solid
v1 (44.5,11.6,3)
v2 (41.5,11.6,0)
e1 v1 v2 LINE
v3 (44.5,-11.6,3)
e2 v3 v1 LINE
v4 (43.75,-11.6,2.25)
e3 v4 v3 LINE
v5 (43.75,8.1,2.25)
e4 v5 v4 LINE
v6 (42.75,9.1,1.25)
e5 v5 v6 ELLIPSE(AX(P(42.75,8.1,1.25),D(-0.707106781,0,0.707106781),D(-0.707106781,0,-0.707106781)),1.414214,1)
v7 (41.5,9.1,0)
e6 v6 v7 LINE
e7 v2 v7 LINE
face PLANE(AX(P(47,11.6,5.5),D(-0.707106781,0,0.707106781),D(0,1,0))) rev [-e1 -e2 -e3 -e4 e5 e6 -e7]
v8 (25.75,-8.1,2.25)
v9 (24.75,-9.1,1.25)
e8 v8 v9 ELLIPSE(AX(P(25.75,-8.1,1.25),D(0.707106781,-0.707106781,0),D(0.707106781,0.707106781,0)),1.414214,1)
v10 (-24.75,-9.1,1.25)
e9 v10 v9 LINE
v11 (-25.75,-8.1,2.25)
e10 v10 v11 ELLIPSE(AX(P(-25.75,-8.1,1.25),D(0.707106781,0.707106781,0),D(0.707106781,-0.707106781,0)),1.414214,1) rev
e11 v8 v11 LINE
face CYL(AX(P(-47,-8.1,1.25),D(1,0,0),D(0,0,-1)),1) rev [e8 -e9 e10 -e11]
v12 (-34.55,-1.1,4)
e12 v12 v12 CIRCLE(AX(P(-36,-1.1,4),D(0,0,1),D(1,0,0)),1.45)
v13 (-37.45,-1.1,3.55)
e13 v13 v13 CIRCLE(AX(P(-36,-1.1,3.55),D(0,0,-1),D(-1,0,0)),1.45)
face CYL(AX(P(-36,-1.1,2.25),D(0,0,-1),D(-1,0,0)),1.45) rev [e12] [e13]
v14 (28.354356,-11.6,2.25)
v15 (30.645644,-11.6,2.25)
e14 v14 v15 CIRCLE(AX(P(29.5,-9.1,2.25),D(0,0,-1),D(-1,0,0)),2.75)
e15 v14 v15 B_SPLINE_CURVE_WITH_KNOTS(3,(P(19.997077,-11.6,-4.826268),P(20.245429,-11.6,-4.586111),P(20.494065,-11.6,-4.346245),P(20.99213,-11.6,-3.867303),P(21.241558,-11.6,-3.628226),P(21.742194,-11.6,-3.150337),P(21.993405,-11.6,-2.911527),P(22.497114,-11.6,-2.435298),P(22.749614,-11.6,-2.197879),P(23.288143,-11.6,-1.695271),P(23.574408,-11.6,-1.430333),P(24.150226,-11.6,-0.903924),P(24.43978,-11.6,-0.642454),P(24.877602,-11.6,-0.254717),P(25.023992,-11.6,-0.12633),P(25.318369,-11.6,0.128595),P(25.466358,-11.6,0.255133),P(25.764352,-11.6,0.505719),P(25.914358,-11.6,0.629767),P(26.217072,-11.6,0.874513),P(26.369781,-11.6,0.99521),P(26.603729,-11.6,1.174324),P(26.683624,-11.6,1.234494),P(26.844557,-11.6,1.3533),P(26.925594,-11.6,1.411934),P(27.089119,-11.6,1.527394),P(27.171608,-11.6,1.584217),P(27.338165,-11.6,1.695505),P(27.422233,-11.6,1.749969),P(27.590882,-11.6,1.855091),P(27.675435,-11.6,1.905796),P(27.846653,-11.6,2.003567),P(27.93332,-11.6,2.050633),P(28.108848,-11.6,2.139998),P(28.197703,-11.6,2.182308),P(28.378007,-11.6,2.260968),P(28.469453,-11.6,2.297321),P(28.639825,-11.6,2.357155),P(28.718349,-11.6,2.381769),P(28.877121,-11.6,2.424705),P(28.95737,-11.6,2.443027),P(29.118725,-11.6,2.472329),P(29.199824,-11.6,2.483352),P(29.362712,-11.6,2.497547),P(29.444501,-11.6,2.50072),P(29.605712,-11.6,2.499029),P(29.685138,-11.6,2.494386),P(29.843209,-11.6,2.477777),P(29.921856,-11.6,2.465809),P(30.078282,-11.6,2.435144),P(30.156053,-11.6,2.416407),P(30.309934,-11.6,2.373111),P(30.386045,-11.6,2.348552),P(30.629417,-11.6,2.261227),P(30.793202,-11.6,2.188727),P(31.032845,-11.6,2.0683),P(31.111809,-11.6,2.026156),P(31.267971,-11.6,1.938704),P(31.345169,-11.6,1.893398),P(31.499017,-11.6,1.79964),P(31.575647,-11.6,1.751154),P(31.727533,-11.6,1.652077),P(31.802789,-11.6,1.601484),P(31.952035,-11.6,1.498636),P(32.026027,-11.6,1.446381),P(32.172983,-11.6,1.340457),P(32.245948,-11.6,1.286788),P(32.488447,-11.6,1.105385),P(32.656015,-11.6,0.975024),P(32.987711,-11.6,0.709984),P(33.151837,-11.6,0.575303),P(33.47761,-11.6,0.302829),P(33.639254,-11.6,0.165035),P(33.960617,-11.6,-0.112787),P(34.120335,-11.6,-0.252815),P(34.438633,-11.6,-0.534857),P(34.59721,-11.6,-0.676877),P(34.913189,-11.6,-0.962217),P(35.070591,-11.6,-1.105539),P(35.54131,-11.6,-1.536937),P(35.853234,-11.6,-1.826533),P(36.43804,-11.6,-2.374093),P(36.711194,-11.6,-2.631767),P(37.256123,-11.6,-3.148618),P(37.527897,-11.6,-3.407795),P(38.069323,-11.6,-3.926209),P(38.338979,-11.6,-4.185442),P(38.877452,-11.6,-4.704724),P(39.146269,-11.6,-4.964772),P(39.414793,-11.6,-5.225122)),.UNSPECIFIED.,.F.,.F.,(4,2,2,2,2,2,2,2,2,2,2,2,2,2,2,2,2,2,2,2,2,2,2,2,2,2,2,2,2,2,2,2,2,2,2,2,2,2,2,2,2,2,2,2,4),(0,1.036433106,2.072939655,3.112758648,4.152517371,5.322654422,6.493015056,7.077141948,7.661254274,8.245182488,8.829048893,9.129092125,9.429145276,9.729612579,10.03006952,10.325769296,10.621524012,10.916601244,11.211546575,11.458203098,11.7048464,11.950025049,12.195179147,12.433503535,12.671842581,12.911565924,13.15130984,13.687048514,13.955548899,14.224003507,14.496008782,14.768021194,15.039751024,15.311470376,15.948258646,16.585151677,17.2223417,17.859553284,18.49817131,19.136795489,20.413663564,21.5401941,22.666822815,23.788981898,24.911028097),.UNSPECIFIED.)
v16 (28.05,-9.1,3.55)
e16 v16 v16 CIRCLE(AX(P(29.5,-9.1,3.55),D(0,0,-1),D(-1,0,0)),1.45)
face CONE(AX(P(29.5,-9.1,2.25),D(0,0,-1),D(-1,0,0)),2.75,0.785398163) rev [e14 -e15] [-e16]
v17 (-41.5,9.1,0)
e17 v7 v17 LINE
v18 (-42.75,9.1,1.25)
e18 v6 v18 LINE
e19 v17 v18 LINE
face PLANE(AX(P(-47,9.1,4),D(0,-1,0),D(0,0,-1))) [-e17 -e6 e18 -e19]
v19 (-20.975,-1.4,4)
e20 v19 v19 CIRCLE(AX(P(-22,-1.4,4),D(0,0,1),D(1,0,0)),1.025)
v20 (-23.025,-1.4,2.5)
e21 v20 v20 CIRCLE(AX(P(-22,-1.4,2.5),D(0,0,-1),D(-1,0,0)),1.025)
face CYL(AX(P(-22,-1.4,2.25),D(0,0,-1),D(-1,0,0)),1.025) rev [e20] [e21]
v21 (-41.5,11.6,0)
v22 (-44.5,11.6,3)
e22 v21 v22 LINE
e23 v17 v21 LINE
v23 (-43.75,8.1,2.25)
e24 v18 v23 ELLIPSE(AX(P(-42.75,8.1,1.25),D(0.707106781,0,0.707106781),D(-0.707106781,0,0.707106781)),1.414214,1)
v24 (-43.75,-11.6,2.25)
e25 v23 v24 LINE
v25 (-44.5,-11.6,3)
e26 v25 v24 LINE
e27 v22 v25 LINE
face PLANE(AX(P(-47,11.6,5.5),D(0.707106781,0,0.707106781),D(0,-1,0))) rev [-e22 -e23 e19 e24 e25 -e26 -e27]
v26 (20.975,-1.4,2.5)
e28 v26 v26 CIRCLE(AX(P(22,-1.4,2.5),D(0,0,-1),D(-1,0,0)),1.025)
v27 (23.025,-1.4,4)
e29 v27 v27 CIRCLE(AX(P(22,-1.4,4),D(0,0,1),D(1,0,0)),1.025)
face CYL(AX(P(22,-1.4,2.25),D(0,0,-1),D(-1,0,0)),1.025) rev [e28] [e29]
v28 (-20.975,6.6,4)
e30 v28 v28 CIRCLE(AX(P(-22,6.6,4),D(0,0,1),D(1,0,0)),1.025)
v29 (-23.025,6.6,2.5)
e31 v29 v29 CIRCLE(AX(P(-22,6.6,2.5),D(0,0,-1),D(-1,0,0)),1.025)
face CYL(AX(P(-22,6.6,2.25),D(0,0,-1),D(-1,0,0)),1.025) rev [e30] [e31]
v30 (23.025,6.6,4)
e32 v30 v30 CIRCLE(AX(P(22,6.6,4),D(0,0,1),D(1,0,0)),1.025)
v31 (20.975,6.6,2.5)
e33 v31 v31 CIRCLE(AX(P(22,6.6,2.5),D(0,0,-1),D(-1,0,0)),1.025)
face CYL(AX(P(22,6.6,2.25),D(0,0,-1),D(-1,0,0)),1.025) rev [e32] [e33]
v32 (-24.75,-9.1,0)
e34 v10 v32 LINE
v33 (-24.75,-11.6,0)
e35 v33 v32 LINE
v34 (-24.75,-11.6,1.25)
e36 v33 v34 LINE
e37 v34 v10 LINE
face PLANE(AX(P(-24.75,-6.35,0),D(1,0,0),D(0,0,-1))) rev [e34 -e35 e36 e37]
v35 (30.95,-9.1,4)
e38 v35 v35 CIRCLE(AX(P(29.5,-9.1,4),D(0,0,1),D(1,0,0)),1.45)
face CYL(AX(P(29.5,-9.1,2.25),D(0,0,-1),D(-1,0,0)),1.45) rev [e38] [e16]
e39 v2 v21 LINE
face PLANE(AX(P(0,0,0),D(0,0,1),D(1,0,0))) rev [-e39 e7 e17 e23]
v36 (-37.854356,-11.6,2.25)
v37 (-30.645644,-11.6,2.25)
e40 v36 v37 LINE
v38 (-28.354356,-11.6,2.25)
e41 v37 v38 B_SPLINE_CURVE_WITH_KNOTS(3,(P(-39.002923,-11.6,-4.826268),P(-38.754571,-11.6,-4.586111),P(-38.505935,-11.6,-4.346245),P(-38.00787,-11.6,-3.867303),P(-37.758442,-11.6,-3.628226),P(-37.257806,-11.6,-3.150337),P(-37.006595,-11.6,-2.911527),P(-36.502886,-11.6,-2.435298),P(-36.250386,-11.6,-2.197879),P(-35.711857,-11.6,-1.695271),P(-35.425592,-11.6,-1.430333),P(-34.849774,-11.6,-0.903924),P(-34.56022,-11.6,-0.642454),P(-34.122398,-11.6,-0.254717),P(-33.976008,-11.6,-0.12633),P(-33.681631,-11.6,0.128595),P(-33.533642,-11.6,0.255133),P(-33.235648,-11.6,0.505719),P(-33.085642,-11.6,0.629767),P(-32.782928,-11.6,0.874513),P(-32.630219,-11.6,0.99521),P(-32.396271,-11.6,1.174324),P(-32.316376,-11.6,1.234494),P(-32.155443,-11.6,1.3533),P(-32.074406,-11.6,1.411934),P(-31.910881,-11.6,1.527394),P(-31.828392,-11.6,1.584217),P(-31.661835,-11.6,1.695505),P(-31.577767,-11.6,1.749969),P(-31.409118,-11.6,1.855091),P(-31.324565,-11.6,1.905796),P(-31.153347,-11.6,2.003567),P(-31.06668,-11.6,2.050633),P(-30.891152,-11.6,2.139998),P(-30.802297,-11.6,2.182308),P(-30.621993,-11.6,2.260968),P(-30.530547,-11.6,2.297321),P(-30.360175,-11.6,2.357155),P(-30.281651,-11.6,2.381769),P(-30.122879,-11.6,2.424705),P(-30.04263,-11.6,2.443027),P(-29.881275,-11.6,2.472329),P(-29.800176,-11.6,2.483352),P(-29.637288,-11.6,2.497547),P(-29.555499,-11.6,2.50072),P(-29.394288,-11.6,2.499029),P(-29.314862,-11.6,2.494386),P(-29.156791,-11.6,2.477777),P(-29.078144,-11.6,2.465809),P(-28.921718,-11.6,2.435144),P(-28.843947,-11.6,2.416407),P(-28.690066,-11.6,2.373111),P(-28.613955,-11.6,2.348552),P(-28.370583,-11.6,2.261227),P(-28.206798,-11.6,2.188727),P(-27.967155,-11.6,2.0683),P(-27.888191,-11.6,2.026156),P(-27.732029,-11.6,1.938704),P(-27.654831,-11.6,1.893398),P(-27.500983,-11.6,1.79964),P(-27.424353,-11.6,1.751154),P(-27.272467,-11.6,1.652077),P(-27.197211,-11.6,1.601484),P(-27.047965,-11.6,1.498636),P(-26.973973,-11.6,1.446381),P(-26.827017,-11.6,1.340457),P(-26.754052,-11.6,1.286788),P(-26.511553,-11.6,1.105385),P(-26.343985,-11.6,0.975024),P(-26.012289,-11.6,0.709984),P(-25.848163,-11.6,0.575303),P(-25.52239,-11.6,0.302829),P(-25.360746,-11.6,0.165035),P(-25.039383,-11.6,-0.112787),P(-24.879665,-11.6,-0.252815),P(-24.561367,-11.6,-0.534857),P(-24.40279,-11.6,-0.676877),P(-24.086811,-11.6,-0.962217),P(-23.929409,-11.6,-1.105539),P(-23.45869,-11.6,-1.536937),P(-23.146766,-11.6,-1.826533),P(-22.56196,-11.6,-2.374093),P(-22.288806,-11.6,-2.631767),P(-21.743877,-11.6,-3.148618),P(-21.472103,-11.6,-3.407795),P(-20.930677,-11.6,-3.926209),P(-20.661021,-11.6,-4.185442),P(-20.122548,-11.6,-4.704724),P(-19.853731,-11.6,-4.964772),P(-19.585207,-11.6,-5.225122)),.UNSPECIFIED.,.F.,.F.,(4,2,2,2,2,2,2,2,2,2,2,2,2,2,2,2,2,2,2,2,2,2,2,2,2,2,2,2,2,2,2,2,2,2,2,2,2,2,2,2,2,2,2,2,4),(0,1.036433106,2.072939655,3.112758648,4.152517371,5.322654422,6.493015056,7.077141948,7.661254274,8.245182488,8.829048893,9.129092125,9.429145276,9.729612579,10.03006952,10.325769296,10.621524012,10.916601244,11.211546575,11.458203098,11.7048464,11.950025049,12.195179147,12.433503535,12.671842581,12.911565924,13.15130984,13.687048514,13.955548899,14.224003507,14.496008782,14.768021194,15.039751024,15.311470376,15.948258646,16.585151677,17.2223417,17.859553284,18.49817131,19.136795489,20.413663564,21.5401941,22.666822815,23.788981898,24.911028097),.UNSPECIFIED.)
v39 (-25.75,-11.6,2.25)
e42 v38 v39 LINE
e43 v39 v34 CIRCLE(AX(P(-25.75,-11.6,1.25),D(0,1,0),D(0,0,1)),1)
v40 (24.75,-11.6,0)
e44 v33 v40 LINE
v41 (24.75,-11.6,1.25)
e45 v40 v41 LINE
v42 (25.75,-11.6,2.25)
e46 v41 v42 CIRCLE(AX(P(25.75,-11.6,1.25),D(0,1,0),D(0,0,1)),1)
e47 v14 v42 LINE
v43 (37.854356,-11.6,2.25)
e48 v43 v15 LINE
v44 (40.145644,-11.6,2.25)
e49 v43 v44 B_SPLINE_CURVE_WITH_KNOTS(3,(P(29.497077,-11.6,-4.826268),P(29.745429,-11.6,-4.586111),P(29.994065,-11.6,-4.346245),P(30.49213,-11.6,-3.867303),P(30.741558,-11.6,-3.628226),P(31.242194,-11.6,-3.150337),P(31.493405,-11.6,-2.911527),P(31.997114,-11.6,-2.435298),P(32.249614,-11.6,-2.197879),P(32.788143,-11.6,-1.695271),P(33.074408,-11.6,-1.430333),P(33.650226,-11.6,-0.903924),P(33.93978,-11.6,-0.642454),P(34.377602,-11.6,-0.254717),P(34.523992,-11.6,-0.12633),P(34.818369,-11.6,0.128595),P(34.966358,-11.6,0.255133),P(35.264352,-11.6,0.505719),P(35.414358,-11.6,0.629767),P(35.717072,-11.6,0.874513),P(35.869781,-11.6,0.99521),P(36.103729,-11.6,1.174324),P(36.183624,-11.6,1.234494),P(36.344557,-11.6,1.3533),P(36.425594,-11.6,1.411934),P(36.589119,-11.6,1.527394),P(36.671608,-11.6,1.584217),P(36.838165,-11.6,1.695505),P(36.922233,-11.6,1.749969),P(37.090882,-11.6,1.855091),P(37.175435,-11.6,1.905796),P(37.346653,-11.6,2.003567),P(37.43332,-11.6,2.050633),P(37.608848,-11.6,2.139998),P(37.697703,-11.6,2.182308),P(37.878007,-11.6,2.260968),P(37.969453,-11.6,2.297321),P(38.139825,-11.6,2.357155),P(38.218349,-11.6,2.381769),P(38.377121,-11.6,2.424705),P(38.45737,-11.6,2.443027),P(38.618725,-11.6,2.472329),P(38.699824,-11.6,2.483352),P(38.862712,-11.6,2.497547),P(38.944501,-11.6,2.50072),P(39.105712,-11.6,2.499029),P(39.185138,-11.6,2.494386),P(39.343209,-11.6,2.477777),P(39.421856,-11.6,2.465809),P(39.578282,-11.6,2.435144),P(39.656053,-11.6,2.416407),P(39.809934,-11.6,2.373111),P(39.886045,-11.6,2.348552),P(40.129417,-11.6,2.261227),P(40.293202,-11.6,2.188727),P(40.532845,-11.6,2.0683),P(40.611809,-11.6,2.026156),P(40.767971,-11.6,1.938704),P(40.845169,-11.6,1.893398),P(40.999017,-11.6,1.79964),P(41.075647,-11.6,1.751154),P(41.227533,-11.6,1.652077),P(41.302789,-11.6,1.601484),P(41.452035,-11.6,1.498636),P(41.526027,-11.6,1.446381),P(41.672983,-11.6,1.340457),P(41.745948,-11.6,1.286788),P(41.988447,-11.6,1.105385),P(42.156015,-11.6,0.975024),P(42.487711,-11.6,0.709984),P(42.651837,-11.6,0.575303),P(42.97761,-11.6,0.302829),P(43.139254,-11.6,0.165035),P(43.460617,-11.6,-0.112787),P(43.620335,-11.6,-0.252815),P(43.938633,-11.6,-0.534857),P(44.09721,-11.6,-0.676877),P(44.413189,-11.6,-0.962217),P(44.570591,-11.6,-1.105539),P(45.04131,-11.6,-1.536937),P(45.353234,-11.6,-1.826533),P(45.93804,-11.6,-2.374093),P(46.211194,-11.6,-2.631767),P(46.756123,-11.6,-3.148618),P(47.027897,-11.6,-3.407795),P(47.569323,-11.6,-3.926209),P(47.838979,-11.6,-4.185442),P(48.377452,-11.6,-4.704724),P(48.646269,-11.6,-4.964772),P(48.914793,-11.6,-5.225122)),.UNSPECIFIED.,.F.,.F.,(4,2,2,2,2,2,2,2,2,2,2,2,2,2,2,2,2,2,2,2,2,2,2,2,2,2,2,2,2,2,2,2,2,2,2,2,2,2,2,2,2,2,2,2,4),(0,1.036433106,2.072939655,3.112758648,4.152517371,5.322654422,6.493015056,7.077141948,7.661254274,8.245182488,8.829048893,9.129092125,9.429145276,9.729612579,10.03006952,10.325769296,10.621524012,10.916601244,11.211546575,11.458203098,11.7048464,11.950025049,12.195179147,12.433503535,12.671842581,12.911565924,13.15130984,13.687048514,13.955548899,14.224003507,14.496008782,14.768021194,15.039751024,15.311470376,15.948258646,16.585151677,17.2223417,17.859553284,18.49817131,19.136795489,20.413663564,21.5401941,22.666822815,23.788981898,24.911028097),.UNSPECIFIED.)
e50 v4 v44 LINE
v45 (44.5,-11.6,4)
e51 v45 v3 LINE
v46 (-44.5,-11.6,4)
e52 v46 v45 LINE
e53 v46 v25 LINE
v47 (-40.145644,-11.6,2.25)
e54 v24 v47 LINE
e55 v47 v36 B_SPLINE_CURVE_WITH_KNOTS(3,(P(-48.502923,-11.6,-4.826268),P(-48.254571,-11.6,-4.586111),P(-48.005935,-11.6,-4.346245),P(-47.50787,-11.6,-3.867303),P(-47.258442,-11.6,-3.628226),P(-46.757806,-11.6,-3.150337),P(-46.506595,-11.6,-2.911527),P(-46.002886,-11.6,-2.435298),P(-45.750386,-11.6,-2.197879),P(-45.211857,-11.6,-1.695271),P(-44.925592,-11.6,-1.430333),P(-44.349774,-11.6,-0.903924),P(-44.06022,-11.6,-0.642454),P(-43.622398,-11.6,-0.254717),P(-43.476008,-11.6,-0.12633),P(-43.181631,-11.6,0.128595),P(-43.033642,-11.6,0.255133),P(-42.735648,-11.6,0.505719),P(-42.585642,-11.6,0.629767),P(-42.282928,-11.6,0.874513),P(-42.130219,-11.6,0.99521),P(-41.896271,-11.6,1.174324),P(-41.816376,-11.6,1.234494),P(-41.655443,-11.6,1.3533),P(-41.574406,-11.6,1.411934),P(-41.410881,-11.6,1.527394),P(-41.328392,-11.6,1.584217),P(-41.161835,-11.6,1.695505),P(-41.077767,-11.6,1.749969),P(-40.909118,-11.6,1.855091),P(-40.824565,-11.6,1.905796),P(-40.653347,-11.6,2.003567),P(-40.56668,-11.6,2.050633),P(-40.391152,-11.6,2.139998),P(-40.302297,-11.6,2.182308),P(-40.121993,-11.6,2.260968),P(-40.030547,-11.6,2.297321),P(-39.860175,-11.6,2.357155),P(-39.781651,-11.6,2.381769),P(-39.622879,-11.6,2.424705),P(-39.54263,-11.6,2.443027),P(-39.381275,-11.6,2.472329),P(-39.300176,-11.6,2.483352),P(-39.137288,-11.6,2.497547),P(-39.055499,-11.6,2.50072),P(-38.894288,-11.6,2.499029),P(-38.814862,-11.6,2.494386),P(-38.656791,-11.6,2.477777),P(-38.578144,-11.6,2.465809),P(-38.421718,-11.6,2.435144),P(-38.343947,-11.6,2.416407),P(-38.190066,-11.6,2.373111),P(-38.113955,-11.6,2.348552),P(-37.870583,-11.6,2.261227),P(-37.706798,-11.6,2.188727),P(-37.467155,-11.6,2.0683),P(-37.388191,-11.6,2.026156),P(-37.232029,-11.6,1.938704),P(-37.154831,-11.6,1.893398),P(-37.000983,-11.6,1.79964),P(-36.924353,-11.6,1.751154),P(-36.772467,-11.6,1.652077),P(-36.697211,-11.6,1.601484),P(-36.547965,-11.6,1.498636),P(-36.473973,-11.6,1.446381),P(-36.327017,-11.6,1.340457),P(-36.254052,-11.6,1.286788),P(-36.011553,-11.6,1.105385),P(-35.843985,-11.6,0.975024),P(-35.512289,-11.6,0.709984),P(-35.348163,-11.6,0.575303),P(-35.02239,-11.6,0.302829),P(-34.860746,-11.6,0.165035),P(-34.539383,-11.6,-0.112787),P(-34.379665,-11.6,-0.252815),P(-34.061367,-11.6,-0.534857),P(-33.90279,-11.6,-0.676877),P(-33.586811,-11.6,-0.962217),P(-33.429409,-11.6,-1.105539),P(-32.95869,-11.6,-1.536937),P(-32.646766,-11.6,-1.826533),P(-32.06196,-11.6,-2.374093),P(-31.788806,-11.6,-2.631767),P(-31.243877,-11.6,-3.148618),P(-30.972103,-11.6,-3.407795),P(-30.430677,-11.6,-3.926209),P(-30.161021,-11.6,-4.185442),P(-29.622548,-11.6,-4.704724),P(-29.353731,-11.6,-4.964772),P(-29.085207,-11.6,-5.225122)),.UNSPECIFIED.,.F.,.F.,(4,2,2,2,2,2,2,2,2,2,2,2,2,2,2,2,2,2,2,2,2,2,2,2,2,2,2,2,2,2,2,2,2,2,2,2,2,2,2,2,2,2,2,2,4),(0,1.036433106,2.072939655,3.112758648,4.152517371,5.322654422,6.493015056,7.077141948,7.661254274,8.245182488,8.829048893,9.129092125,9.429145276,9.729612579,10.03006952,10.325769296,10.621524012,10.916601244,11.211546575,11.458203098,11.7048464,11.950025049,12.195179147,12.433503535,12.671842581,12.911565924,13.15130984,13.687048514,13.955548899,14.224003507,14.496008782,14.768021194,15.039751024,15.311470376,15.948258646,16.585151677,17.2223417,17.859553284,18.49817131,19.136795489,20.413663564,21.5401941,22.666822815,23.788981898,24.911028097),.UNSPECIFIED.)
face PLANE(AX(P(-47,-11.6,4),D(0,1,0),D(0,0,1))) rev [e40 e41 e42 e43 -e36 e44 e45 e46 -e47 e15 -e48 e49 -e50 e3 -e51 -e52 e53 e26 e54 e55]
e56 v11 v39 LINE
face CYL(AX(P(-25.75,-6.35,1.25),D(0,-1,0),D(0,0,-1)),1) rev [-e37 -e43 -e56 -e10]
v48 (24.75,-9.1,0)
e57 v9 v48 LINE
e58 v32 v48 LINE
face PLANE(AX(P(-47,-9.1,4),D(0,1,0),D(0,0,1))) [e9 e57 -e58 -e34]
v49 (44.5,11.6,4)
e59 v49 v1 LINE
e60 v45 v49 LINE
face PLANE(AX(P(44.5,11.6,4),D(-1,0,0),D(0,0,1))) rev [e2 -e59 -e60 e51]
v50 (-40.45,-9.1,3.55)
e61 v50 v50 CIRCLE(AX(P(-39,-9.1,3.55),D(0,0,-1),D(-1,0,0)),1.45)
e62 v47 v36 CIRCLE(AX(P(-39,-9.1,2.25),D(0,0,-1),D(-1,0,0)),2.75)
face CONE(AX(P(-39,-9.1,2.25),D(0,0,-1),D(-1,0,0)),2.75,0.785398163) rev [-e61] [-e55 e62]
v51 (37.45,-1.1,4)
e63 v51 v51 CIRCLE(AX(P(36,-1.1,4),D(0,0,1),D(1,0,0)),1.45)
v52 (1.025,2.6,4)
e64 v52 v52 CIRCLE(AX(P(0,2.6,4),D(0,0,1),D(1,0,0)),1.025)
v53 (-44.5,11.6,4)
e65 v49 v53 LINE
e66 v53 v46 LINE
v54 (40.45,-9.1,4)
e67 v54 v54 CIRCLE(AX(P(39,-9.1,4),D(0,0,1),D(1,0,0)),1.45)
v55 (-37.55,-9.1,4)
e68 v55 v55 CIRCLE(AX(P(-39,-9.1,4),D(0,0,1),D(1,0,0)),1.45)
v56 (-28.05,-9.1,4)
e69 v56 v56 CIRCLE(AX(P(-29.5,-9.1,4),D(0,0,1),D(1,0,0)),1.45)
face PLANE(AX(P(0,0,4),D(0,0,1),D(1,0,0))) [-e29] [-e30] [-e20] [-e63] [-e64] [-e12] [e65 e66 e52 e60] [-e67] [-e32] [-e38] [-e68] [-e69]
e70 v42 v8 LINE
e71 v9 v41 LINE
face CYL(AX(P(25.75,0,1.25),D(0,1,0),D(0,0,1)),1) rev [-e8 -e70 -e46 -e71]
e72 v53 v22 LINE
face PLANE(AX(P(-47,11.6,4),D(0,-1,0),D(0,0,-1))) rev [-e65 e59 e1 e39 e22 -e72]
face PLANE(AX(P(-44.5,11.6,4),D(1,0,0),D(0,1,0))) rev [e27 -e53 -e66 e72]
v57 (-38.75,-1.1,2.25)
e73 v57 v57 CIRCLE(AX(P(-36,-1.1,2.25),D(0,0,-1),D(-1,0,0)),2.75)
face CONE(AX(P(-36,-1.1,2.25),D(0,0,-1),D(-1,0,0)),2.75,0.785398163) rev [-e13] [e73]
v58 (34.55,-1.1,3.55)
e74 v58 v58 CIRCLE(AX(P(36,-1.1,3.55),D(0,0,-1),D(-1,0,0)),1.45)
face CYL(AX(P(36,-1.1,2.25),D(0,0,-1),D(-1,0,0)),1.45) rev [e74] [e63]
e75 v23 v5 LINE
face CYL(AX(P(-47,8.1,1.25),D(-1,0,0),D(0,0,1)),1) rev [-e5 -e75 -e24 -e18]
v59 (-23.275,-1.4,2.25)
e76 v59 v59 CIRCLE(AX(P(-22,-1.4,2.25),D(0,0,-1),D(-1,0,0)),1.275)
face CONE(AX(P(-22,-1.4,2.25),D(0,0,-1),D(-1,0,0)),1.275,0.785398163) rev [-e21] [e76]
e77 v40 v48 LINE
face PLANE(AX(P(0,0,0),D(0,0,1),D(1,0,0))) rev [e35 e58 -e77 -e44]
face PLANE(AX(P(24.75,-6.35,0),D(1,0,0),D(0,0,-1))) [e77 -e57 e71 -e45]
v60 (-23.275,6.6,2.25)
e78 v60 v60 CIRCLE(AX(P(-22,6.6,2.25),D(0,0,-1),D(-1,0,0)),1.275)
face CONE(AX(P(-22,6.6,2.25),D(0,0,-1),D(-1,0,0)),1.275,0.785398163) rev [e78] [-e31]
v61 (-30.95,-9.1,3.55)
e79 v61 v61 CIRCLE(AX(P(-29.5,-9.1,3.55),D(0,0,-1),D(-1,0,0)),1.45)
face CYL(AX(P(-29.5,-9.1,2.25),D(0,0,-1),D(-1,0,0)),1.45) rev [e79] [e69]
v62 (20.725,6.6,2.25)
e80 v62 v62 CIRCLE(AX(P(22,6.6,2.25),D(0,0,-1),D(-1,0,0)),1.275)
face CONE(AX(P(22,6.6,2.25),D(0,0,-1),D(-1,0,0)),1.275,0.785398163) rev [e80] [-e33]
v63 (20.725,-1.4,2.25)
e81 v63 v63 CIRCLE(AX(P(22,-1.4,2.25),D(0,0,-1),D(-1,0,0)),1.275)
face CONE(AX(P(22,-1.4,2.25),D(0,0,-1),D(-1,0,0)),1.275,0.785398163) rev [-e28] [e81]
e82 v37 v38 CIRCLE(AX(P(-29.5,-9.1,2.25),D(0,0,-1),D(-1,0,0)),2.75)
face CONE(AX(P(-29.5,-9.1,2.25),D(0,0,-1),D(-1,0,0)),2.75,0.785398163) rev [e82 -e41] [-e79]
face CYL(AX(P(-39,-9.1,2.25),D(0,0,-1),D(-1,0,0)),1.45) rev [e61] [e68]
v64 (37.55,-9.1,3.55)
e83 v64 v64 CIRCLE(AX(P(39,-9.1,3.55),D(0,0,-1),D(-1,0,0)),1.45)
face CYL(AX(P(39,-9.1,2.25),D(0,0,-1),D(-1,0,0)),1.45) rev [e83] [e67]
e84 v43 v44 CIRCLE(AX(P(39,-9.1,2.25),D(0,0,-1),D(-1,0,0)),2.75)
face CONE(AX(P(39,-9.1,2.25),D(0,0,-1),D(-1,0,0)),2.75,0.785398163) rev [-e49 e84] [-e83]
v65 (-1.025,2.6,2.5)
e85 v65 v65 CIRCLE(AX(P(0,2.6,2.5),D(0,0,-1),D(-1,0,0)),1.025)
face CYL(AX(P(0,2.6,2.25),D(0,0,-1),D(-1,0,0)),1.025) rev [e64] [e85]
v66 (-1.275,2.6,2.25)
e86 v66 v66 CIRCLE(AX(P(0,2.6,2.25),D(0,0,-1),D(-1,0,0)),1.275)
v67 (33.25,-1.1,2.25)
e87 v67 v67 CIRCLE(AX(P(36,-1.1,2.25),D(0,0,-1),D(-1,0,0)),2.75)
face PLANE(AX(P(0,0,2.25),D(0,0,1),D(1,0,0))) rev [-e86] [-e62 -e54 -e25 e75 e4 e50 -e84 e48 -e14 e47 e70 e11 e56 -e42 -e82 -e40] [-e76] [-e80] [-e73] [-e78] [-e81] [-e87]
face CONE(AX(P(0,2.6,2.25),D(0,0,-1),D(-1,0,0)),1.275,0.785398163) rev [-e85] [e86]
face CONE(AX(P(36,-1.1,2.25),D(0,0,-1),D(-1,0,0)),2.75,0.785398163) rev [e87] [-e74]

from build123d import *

# Parameters (mm, degrees)
SKETCH1_W                                      = 94
SKETCH1_H                                      = 23.2
BOSS_EXTRUDE1_DEPTH                            = 4
CHAMFER1_SIZE                                  = 5.5
CUT_EXTRUDE2_DEPTH                             = 48.12547082
CUT_EXTRUDE2_DEPTH_BACK                        = 48.12547082
SKETCH9_W                                      = 30.391833943
SKETCH9_H                                      = 23.2
SHELL1_START                                   = -9.1
SHELL1_DEPTH                                   = 18.2
FILLET1_R                                      = 1
M2_5X0_45_TAPPED_HOLE1_D                       = 2.05
M2_5X0_45_TAPPED_HOLE1_DEPTH                   = 6
M2_5X0_45_TAPPED_HOLE1_CSINK_D                 = 2.55
M2_5X0_45_TAPPED_HOLE1_CSINK_ANGLE             = 90
M2_5X0_45_TAPPED_HOLE1_TIP                     = 0.615882135
CSK_FOR_M2_5_FLAT_HEAD_MACHINE_SCREW1_AT_COUNT = 2
CSK_FOR_M2_5_FLAT_HEAD_MACHINE_SCREW1_AT_PITCH = 8.544003745
CSK_FOR_M2_5_FLAT_HEAD_MACHINE_SCREW_2_COUNT   = 2
CSK_FOR_M2_5_FLAT_HEAD_MACHINE_SCREW_2_PITCH   = 10.307764064
SKETCH8_W                                      = 19.75
SKETCH8_H                                      = 5.25
CUT_EXTRUDE1_DEPTH                             = 47.042073151
FILLET5_R                                      = 1
FILLET5_OF_MIRROR1_R                           = 1


# Read off the part's stored shape, not the designer's step: Shell1
with BuildPart() as part:
    # Sketch1 → Boss-Extrude1 (new body)
    with BuildSketch(Plane.XY):
        Rectangle(SKETCH1_W, SKETCH1_H)
    extrude(amount=BOSS_EXTRUDE1_DEPTH)

    # Chamfer1
    # the kernel refuses this chamfer: 5.5 mm, written as the material it takes off along each edge
    with BuildSketch(Plane(origin=(47, 25.744256434, 0), x_dir=(0.027495876610585942, 0, 0.9996219169112968), z_dir=(0, -1, 0)), Plane(origin=(-47, -25.744256434, 0), x_dir=(-0.027495876610585942, 0, 0.9996219169112968), z_dir=(0, 1, 0))) as chamfer1_piece_1:
        Polygon((CHAMFER1_SIZE * 0.999621916911, CHAMFER1_SIZE * 0.0274958766106), (-CHAMFER1_SIZE * 0.0274958766106, CHAMFER1_SIZE * 0.999621916911), (0, 0), align=None)
    extrude(amount=51.488512868, mode=Mode.SUBTRACT)

    # Sketch9 → Cut-Extrude2 (cut, two sides: drawn at the far end of the back side and taken through both)
    with BuildSketch(Plane(origin=(0, 0, 0), x_dir=(-1, 0, 0), z_dir=(0, 0, -1)).offset(-CUT_EXTRUDE2_DEPTH_BACK)):
        with Locations((-59.695916972, 0)):
            Rectangle(SKETCH9_W, SKETCH9_H)
        with Locations((59.695916972, 0)):
            Rectangle(SKETCH9_W, SKETCH9_H)
    extrude(amount=CUT_EXTRUDE2_DEPTH + CUT_EXTRUDE2_DEPTH_BACK, mode=Mode.SUBTRACT)

    # Shell1 outline → Shell1 (cut)
    with BuildSketch(Plane(origin=(0, 0, 0), x_dir=(1, 0, 0), z_dir=(0, 1, 0)).offset(SHELL1_START)):
        Polygon((-41.5, 0), (-43.75, -2.25), (43.75, -2.25), (41.5, 0), align=None)
    extrude(amount=SHELL1_DEPTH, mode=Mode.SUBTRACT)

    # Fillet1
    fillet1_edges = [part.edges().sort_by_distance(p)[0] for p in [
        (0, 9.1, 2.25),
        (0, -9.1, 2.25),
    ]]
    fillet(fillet1_edges, radius=FILLET1_R)

    # M2.5x0.45 Tapped Hole1
    with Locations(Plane(origin=(0, 0, 2.25), x_dir=(-1, 0, 0), z_dir=(0, 0, -1))):
        with Locations((0, 2.6), (-22, 6.6), (-22, -1.4), (22, -1.4), (22, 6.6)):
            CounterSinkHole(M2_5X0_45_TAPPED_HOLE1_D / 2, M2_5X0_45_TAPPED_HOLE1_CSINK_D / 2, depth=M2_5X0_45_TAPPED_HOLE1_DEPTH, counter_sink_angle=M2_5X0_45_TAPPED_HOLE1_CSINK_ANGLE)
            with Locations((0, 0, -(M2_5X0_45_TAPPED_HOLE1_DEPTH + M2_5X0_45_TAPPED_HOLE1_TIP / 2))):  # 118° drill point
                Cone(0, M2_5X0_45_TAPPED_HOLE1_D / 2, M2_5X0_45_TAPPED_HOLE1_TIP, mode=Mode.SUBTRACT)

    # Sketch5 → CSK for M2.5 Flat Head Machine Screw1 (revolve, cut)
    with BuildSketch(Plane(origin=(36, -1.1, 2.25), x_dir=(0, 1, 0), z_dir=(1, 0, 0))):
        Polygon((0, 0), (0, 7.321247898), (1.45, 6.45), (1.45, 1.3), (2.75, 0), align=None)
    csk_for_m2_5_flat_head_machine_screw1 = revolve(axis=Axis((36, -1.1, -4.1), (0, 0, 1)), mode=Mode.SUBTRACT)

    # CSK for M2.5 Flat Head Machine Screw1 at: CSK for M2.5 Flat Head Machine Screw1 ×2
    with Locations(*[Vector(0.35112344158839104, -0.9363291775690448, 0) * (i * CSK_FOR_M2_5_FLAT_HEAD_MACHINE_SCREW1_AT_PITCH) for i in range(1, CSK_FOR_M2_5_FLAT_HEAD_MACHINE_SCREW1_AT_COUNT)]):
        add(csk_for_m2_5_flat_head_machine_screw1, mode=Mode.SUBTRACT)

    # CSK for M2.5 Flat Head Machine Screw 2: CSK for M2.5 Flat Head Machine Screw1 ×2
    with Locations(*[Vector(-0.6305926250944661, -0.7761140001162652, 0) * (i * CSK_FOR_M2_5_FLAT_HEAD_MACHINE_SCREW_2_PITCH) for i in range(1, CSK_FOR_M2_5_FLAT_HEAD_MACHINE_SCREW_2_COUNT)]):
        add(csk_for_m2_5_flat_head_machine_screw1, mode=Mode.SUBTRACT)

    # Sketch8 → Cut-Extrude1 (cut, through all)
    with BuildSketch(Plane(origin=(0, 0, 2.25), x_dir=(-1, 0, 0), z_dir=(0, 0, -1))):
        with Locations((-34.625, -8.975)):
            Rectangle(SKETCH8_W, SKETCH8_H)
    cut_extrude1 = extrude(amount=CUT_EXTRUDE1_DEPTH, mode=Mode.SUBTRACT)

    # Fillet5
    fillet5_edges = [part.edges().sort_by_distance(p)[0] for p in [
        (24.75, -9.85, 2.25),
    ]]
    fillet(fillet5_edges, radius=FILLET5_R)

    # Mirror1: CSK for M2.5 Flat Head Machine Screw1, Cut-Extrude1 across plane
    add(csk_for_m2_5_flat_head_machine_screw1.mirror(Plane(origin=(0, 0, 0), x_dir=(0, 0, 1), z_dir=(1, 0, 0))), mode=Mode.SUBTRACT)
    add(cut_extrude1.mirror(Plane(origin=(0, 0, 0), x_dir=(0, 0, 1), z_dir=(1, 0, 0))), mode=Mode.SUBTRACT)

    # Mirror1 copy 1 sketch → Mirror1 copy 1 (revolve, cut)
    with BuildSketch(Plane(origin=(-39, -9.1, 2.25), x_dir=(0, 1, 0), z_dir=(-1, 0, 0))):
        Polygon((0, 0), (0, -7.321247898), (1.45, -6.45), (1.45, -1.3), (2.75, 0), align=None)
    revolve(axis=Axis((-39, -9.1, -4.1), (0, 0, -1)), mode=Mode.SUBTRACT)

    # Mirror1 copy 2 sketch → Mirror1 copy 2 (revolve, cut)
    with BuildSketch(Plane(origin=(-29.5, -9.1, 2.25), x_dir=(0, 1, 0), z_dir=(-1, 0, 0))):
        Polygon((0, 0), (0, -7.321247898), (1.45, -6.45), (1.45, -1.3), (2.75, 0), align=None)
    revolve(axis=Axis((-29.5, -9.1, -4.1), (0, 0, -1)), mode=Mode.SUBTRACT)

    # Fillet5 of Mirror1
    fillet5_of_mirror1_edges = [part.edges().sort_by_distance(p)[0] for p in [
        (-24.75, -9.85, 2.25),
    ]]
    fillet(fillet5_of_mirror1_edges, radius=FILLET5_OF_MIRROR1_R)


solid = part.part
